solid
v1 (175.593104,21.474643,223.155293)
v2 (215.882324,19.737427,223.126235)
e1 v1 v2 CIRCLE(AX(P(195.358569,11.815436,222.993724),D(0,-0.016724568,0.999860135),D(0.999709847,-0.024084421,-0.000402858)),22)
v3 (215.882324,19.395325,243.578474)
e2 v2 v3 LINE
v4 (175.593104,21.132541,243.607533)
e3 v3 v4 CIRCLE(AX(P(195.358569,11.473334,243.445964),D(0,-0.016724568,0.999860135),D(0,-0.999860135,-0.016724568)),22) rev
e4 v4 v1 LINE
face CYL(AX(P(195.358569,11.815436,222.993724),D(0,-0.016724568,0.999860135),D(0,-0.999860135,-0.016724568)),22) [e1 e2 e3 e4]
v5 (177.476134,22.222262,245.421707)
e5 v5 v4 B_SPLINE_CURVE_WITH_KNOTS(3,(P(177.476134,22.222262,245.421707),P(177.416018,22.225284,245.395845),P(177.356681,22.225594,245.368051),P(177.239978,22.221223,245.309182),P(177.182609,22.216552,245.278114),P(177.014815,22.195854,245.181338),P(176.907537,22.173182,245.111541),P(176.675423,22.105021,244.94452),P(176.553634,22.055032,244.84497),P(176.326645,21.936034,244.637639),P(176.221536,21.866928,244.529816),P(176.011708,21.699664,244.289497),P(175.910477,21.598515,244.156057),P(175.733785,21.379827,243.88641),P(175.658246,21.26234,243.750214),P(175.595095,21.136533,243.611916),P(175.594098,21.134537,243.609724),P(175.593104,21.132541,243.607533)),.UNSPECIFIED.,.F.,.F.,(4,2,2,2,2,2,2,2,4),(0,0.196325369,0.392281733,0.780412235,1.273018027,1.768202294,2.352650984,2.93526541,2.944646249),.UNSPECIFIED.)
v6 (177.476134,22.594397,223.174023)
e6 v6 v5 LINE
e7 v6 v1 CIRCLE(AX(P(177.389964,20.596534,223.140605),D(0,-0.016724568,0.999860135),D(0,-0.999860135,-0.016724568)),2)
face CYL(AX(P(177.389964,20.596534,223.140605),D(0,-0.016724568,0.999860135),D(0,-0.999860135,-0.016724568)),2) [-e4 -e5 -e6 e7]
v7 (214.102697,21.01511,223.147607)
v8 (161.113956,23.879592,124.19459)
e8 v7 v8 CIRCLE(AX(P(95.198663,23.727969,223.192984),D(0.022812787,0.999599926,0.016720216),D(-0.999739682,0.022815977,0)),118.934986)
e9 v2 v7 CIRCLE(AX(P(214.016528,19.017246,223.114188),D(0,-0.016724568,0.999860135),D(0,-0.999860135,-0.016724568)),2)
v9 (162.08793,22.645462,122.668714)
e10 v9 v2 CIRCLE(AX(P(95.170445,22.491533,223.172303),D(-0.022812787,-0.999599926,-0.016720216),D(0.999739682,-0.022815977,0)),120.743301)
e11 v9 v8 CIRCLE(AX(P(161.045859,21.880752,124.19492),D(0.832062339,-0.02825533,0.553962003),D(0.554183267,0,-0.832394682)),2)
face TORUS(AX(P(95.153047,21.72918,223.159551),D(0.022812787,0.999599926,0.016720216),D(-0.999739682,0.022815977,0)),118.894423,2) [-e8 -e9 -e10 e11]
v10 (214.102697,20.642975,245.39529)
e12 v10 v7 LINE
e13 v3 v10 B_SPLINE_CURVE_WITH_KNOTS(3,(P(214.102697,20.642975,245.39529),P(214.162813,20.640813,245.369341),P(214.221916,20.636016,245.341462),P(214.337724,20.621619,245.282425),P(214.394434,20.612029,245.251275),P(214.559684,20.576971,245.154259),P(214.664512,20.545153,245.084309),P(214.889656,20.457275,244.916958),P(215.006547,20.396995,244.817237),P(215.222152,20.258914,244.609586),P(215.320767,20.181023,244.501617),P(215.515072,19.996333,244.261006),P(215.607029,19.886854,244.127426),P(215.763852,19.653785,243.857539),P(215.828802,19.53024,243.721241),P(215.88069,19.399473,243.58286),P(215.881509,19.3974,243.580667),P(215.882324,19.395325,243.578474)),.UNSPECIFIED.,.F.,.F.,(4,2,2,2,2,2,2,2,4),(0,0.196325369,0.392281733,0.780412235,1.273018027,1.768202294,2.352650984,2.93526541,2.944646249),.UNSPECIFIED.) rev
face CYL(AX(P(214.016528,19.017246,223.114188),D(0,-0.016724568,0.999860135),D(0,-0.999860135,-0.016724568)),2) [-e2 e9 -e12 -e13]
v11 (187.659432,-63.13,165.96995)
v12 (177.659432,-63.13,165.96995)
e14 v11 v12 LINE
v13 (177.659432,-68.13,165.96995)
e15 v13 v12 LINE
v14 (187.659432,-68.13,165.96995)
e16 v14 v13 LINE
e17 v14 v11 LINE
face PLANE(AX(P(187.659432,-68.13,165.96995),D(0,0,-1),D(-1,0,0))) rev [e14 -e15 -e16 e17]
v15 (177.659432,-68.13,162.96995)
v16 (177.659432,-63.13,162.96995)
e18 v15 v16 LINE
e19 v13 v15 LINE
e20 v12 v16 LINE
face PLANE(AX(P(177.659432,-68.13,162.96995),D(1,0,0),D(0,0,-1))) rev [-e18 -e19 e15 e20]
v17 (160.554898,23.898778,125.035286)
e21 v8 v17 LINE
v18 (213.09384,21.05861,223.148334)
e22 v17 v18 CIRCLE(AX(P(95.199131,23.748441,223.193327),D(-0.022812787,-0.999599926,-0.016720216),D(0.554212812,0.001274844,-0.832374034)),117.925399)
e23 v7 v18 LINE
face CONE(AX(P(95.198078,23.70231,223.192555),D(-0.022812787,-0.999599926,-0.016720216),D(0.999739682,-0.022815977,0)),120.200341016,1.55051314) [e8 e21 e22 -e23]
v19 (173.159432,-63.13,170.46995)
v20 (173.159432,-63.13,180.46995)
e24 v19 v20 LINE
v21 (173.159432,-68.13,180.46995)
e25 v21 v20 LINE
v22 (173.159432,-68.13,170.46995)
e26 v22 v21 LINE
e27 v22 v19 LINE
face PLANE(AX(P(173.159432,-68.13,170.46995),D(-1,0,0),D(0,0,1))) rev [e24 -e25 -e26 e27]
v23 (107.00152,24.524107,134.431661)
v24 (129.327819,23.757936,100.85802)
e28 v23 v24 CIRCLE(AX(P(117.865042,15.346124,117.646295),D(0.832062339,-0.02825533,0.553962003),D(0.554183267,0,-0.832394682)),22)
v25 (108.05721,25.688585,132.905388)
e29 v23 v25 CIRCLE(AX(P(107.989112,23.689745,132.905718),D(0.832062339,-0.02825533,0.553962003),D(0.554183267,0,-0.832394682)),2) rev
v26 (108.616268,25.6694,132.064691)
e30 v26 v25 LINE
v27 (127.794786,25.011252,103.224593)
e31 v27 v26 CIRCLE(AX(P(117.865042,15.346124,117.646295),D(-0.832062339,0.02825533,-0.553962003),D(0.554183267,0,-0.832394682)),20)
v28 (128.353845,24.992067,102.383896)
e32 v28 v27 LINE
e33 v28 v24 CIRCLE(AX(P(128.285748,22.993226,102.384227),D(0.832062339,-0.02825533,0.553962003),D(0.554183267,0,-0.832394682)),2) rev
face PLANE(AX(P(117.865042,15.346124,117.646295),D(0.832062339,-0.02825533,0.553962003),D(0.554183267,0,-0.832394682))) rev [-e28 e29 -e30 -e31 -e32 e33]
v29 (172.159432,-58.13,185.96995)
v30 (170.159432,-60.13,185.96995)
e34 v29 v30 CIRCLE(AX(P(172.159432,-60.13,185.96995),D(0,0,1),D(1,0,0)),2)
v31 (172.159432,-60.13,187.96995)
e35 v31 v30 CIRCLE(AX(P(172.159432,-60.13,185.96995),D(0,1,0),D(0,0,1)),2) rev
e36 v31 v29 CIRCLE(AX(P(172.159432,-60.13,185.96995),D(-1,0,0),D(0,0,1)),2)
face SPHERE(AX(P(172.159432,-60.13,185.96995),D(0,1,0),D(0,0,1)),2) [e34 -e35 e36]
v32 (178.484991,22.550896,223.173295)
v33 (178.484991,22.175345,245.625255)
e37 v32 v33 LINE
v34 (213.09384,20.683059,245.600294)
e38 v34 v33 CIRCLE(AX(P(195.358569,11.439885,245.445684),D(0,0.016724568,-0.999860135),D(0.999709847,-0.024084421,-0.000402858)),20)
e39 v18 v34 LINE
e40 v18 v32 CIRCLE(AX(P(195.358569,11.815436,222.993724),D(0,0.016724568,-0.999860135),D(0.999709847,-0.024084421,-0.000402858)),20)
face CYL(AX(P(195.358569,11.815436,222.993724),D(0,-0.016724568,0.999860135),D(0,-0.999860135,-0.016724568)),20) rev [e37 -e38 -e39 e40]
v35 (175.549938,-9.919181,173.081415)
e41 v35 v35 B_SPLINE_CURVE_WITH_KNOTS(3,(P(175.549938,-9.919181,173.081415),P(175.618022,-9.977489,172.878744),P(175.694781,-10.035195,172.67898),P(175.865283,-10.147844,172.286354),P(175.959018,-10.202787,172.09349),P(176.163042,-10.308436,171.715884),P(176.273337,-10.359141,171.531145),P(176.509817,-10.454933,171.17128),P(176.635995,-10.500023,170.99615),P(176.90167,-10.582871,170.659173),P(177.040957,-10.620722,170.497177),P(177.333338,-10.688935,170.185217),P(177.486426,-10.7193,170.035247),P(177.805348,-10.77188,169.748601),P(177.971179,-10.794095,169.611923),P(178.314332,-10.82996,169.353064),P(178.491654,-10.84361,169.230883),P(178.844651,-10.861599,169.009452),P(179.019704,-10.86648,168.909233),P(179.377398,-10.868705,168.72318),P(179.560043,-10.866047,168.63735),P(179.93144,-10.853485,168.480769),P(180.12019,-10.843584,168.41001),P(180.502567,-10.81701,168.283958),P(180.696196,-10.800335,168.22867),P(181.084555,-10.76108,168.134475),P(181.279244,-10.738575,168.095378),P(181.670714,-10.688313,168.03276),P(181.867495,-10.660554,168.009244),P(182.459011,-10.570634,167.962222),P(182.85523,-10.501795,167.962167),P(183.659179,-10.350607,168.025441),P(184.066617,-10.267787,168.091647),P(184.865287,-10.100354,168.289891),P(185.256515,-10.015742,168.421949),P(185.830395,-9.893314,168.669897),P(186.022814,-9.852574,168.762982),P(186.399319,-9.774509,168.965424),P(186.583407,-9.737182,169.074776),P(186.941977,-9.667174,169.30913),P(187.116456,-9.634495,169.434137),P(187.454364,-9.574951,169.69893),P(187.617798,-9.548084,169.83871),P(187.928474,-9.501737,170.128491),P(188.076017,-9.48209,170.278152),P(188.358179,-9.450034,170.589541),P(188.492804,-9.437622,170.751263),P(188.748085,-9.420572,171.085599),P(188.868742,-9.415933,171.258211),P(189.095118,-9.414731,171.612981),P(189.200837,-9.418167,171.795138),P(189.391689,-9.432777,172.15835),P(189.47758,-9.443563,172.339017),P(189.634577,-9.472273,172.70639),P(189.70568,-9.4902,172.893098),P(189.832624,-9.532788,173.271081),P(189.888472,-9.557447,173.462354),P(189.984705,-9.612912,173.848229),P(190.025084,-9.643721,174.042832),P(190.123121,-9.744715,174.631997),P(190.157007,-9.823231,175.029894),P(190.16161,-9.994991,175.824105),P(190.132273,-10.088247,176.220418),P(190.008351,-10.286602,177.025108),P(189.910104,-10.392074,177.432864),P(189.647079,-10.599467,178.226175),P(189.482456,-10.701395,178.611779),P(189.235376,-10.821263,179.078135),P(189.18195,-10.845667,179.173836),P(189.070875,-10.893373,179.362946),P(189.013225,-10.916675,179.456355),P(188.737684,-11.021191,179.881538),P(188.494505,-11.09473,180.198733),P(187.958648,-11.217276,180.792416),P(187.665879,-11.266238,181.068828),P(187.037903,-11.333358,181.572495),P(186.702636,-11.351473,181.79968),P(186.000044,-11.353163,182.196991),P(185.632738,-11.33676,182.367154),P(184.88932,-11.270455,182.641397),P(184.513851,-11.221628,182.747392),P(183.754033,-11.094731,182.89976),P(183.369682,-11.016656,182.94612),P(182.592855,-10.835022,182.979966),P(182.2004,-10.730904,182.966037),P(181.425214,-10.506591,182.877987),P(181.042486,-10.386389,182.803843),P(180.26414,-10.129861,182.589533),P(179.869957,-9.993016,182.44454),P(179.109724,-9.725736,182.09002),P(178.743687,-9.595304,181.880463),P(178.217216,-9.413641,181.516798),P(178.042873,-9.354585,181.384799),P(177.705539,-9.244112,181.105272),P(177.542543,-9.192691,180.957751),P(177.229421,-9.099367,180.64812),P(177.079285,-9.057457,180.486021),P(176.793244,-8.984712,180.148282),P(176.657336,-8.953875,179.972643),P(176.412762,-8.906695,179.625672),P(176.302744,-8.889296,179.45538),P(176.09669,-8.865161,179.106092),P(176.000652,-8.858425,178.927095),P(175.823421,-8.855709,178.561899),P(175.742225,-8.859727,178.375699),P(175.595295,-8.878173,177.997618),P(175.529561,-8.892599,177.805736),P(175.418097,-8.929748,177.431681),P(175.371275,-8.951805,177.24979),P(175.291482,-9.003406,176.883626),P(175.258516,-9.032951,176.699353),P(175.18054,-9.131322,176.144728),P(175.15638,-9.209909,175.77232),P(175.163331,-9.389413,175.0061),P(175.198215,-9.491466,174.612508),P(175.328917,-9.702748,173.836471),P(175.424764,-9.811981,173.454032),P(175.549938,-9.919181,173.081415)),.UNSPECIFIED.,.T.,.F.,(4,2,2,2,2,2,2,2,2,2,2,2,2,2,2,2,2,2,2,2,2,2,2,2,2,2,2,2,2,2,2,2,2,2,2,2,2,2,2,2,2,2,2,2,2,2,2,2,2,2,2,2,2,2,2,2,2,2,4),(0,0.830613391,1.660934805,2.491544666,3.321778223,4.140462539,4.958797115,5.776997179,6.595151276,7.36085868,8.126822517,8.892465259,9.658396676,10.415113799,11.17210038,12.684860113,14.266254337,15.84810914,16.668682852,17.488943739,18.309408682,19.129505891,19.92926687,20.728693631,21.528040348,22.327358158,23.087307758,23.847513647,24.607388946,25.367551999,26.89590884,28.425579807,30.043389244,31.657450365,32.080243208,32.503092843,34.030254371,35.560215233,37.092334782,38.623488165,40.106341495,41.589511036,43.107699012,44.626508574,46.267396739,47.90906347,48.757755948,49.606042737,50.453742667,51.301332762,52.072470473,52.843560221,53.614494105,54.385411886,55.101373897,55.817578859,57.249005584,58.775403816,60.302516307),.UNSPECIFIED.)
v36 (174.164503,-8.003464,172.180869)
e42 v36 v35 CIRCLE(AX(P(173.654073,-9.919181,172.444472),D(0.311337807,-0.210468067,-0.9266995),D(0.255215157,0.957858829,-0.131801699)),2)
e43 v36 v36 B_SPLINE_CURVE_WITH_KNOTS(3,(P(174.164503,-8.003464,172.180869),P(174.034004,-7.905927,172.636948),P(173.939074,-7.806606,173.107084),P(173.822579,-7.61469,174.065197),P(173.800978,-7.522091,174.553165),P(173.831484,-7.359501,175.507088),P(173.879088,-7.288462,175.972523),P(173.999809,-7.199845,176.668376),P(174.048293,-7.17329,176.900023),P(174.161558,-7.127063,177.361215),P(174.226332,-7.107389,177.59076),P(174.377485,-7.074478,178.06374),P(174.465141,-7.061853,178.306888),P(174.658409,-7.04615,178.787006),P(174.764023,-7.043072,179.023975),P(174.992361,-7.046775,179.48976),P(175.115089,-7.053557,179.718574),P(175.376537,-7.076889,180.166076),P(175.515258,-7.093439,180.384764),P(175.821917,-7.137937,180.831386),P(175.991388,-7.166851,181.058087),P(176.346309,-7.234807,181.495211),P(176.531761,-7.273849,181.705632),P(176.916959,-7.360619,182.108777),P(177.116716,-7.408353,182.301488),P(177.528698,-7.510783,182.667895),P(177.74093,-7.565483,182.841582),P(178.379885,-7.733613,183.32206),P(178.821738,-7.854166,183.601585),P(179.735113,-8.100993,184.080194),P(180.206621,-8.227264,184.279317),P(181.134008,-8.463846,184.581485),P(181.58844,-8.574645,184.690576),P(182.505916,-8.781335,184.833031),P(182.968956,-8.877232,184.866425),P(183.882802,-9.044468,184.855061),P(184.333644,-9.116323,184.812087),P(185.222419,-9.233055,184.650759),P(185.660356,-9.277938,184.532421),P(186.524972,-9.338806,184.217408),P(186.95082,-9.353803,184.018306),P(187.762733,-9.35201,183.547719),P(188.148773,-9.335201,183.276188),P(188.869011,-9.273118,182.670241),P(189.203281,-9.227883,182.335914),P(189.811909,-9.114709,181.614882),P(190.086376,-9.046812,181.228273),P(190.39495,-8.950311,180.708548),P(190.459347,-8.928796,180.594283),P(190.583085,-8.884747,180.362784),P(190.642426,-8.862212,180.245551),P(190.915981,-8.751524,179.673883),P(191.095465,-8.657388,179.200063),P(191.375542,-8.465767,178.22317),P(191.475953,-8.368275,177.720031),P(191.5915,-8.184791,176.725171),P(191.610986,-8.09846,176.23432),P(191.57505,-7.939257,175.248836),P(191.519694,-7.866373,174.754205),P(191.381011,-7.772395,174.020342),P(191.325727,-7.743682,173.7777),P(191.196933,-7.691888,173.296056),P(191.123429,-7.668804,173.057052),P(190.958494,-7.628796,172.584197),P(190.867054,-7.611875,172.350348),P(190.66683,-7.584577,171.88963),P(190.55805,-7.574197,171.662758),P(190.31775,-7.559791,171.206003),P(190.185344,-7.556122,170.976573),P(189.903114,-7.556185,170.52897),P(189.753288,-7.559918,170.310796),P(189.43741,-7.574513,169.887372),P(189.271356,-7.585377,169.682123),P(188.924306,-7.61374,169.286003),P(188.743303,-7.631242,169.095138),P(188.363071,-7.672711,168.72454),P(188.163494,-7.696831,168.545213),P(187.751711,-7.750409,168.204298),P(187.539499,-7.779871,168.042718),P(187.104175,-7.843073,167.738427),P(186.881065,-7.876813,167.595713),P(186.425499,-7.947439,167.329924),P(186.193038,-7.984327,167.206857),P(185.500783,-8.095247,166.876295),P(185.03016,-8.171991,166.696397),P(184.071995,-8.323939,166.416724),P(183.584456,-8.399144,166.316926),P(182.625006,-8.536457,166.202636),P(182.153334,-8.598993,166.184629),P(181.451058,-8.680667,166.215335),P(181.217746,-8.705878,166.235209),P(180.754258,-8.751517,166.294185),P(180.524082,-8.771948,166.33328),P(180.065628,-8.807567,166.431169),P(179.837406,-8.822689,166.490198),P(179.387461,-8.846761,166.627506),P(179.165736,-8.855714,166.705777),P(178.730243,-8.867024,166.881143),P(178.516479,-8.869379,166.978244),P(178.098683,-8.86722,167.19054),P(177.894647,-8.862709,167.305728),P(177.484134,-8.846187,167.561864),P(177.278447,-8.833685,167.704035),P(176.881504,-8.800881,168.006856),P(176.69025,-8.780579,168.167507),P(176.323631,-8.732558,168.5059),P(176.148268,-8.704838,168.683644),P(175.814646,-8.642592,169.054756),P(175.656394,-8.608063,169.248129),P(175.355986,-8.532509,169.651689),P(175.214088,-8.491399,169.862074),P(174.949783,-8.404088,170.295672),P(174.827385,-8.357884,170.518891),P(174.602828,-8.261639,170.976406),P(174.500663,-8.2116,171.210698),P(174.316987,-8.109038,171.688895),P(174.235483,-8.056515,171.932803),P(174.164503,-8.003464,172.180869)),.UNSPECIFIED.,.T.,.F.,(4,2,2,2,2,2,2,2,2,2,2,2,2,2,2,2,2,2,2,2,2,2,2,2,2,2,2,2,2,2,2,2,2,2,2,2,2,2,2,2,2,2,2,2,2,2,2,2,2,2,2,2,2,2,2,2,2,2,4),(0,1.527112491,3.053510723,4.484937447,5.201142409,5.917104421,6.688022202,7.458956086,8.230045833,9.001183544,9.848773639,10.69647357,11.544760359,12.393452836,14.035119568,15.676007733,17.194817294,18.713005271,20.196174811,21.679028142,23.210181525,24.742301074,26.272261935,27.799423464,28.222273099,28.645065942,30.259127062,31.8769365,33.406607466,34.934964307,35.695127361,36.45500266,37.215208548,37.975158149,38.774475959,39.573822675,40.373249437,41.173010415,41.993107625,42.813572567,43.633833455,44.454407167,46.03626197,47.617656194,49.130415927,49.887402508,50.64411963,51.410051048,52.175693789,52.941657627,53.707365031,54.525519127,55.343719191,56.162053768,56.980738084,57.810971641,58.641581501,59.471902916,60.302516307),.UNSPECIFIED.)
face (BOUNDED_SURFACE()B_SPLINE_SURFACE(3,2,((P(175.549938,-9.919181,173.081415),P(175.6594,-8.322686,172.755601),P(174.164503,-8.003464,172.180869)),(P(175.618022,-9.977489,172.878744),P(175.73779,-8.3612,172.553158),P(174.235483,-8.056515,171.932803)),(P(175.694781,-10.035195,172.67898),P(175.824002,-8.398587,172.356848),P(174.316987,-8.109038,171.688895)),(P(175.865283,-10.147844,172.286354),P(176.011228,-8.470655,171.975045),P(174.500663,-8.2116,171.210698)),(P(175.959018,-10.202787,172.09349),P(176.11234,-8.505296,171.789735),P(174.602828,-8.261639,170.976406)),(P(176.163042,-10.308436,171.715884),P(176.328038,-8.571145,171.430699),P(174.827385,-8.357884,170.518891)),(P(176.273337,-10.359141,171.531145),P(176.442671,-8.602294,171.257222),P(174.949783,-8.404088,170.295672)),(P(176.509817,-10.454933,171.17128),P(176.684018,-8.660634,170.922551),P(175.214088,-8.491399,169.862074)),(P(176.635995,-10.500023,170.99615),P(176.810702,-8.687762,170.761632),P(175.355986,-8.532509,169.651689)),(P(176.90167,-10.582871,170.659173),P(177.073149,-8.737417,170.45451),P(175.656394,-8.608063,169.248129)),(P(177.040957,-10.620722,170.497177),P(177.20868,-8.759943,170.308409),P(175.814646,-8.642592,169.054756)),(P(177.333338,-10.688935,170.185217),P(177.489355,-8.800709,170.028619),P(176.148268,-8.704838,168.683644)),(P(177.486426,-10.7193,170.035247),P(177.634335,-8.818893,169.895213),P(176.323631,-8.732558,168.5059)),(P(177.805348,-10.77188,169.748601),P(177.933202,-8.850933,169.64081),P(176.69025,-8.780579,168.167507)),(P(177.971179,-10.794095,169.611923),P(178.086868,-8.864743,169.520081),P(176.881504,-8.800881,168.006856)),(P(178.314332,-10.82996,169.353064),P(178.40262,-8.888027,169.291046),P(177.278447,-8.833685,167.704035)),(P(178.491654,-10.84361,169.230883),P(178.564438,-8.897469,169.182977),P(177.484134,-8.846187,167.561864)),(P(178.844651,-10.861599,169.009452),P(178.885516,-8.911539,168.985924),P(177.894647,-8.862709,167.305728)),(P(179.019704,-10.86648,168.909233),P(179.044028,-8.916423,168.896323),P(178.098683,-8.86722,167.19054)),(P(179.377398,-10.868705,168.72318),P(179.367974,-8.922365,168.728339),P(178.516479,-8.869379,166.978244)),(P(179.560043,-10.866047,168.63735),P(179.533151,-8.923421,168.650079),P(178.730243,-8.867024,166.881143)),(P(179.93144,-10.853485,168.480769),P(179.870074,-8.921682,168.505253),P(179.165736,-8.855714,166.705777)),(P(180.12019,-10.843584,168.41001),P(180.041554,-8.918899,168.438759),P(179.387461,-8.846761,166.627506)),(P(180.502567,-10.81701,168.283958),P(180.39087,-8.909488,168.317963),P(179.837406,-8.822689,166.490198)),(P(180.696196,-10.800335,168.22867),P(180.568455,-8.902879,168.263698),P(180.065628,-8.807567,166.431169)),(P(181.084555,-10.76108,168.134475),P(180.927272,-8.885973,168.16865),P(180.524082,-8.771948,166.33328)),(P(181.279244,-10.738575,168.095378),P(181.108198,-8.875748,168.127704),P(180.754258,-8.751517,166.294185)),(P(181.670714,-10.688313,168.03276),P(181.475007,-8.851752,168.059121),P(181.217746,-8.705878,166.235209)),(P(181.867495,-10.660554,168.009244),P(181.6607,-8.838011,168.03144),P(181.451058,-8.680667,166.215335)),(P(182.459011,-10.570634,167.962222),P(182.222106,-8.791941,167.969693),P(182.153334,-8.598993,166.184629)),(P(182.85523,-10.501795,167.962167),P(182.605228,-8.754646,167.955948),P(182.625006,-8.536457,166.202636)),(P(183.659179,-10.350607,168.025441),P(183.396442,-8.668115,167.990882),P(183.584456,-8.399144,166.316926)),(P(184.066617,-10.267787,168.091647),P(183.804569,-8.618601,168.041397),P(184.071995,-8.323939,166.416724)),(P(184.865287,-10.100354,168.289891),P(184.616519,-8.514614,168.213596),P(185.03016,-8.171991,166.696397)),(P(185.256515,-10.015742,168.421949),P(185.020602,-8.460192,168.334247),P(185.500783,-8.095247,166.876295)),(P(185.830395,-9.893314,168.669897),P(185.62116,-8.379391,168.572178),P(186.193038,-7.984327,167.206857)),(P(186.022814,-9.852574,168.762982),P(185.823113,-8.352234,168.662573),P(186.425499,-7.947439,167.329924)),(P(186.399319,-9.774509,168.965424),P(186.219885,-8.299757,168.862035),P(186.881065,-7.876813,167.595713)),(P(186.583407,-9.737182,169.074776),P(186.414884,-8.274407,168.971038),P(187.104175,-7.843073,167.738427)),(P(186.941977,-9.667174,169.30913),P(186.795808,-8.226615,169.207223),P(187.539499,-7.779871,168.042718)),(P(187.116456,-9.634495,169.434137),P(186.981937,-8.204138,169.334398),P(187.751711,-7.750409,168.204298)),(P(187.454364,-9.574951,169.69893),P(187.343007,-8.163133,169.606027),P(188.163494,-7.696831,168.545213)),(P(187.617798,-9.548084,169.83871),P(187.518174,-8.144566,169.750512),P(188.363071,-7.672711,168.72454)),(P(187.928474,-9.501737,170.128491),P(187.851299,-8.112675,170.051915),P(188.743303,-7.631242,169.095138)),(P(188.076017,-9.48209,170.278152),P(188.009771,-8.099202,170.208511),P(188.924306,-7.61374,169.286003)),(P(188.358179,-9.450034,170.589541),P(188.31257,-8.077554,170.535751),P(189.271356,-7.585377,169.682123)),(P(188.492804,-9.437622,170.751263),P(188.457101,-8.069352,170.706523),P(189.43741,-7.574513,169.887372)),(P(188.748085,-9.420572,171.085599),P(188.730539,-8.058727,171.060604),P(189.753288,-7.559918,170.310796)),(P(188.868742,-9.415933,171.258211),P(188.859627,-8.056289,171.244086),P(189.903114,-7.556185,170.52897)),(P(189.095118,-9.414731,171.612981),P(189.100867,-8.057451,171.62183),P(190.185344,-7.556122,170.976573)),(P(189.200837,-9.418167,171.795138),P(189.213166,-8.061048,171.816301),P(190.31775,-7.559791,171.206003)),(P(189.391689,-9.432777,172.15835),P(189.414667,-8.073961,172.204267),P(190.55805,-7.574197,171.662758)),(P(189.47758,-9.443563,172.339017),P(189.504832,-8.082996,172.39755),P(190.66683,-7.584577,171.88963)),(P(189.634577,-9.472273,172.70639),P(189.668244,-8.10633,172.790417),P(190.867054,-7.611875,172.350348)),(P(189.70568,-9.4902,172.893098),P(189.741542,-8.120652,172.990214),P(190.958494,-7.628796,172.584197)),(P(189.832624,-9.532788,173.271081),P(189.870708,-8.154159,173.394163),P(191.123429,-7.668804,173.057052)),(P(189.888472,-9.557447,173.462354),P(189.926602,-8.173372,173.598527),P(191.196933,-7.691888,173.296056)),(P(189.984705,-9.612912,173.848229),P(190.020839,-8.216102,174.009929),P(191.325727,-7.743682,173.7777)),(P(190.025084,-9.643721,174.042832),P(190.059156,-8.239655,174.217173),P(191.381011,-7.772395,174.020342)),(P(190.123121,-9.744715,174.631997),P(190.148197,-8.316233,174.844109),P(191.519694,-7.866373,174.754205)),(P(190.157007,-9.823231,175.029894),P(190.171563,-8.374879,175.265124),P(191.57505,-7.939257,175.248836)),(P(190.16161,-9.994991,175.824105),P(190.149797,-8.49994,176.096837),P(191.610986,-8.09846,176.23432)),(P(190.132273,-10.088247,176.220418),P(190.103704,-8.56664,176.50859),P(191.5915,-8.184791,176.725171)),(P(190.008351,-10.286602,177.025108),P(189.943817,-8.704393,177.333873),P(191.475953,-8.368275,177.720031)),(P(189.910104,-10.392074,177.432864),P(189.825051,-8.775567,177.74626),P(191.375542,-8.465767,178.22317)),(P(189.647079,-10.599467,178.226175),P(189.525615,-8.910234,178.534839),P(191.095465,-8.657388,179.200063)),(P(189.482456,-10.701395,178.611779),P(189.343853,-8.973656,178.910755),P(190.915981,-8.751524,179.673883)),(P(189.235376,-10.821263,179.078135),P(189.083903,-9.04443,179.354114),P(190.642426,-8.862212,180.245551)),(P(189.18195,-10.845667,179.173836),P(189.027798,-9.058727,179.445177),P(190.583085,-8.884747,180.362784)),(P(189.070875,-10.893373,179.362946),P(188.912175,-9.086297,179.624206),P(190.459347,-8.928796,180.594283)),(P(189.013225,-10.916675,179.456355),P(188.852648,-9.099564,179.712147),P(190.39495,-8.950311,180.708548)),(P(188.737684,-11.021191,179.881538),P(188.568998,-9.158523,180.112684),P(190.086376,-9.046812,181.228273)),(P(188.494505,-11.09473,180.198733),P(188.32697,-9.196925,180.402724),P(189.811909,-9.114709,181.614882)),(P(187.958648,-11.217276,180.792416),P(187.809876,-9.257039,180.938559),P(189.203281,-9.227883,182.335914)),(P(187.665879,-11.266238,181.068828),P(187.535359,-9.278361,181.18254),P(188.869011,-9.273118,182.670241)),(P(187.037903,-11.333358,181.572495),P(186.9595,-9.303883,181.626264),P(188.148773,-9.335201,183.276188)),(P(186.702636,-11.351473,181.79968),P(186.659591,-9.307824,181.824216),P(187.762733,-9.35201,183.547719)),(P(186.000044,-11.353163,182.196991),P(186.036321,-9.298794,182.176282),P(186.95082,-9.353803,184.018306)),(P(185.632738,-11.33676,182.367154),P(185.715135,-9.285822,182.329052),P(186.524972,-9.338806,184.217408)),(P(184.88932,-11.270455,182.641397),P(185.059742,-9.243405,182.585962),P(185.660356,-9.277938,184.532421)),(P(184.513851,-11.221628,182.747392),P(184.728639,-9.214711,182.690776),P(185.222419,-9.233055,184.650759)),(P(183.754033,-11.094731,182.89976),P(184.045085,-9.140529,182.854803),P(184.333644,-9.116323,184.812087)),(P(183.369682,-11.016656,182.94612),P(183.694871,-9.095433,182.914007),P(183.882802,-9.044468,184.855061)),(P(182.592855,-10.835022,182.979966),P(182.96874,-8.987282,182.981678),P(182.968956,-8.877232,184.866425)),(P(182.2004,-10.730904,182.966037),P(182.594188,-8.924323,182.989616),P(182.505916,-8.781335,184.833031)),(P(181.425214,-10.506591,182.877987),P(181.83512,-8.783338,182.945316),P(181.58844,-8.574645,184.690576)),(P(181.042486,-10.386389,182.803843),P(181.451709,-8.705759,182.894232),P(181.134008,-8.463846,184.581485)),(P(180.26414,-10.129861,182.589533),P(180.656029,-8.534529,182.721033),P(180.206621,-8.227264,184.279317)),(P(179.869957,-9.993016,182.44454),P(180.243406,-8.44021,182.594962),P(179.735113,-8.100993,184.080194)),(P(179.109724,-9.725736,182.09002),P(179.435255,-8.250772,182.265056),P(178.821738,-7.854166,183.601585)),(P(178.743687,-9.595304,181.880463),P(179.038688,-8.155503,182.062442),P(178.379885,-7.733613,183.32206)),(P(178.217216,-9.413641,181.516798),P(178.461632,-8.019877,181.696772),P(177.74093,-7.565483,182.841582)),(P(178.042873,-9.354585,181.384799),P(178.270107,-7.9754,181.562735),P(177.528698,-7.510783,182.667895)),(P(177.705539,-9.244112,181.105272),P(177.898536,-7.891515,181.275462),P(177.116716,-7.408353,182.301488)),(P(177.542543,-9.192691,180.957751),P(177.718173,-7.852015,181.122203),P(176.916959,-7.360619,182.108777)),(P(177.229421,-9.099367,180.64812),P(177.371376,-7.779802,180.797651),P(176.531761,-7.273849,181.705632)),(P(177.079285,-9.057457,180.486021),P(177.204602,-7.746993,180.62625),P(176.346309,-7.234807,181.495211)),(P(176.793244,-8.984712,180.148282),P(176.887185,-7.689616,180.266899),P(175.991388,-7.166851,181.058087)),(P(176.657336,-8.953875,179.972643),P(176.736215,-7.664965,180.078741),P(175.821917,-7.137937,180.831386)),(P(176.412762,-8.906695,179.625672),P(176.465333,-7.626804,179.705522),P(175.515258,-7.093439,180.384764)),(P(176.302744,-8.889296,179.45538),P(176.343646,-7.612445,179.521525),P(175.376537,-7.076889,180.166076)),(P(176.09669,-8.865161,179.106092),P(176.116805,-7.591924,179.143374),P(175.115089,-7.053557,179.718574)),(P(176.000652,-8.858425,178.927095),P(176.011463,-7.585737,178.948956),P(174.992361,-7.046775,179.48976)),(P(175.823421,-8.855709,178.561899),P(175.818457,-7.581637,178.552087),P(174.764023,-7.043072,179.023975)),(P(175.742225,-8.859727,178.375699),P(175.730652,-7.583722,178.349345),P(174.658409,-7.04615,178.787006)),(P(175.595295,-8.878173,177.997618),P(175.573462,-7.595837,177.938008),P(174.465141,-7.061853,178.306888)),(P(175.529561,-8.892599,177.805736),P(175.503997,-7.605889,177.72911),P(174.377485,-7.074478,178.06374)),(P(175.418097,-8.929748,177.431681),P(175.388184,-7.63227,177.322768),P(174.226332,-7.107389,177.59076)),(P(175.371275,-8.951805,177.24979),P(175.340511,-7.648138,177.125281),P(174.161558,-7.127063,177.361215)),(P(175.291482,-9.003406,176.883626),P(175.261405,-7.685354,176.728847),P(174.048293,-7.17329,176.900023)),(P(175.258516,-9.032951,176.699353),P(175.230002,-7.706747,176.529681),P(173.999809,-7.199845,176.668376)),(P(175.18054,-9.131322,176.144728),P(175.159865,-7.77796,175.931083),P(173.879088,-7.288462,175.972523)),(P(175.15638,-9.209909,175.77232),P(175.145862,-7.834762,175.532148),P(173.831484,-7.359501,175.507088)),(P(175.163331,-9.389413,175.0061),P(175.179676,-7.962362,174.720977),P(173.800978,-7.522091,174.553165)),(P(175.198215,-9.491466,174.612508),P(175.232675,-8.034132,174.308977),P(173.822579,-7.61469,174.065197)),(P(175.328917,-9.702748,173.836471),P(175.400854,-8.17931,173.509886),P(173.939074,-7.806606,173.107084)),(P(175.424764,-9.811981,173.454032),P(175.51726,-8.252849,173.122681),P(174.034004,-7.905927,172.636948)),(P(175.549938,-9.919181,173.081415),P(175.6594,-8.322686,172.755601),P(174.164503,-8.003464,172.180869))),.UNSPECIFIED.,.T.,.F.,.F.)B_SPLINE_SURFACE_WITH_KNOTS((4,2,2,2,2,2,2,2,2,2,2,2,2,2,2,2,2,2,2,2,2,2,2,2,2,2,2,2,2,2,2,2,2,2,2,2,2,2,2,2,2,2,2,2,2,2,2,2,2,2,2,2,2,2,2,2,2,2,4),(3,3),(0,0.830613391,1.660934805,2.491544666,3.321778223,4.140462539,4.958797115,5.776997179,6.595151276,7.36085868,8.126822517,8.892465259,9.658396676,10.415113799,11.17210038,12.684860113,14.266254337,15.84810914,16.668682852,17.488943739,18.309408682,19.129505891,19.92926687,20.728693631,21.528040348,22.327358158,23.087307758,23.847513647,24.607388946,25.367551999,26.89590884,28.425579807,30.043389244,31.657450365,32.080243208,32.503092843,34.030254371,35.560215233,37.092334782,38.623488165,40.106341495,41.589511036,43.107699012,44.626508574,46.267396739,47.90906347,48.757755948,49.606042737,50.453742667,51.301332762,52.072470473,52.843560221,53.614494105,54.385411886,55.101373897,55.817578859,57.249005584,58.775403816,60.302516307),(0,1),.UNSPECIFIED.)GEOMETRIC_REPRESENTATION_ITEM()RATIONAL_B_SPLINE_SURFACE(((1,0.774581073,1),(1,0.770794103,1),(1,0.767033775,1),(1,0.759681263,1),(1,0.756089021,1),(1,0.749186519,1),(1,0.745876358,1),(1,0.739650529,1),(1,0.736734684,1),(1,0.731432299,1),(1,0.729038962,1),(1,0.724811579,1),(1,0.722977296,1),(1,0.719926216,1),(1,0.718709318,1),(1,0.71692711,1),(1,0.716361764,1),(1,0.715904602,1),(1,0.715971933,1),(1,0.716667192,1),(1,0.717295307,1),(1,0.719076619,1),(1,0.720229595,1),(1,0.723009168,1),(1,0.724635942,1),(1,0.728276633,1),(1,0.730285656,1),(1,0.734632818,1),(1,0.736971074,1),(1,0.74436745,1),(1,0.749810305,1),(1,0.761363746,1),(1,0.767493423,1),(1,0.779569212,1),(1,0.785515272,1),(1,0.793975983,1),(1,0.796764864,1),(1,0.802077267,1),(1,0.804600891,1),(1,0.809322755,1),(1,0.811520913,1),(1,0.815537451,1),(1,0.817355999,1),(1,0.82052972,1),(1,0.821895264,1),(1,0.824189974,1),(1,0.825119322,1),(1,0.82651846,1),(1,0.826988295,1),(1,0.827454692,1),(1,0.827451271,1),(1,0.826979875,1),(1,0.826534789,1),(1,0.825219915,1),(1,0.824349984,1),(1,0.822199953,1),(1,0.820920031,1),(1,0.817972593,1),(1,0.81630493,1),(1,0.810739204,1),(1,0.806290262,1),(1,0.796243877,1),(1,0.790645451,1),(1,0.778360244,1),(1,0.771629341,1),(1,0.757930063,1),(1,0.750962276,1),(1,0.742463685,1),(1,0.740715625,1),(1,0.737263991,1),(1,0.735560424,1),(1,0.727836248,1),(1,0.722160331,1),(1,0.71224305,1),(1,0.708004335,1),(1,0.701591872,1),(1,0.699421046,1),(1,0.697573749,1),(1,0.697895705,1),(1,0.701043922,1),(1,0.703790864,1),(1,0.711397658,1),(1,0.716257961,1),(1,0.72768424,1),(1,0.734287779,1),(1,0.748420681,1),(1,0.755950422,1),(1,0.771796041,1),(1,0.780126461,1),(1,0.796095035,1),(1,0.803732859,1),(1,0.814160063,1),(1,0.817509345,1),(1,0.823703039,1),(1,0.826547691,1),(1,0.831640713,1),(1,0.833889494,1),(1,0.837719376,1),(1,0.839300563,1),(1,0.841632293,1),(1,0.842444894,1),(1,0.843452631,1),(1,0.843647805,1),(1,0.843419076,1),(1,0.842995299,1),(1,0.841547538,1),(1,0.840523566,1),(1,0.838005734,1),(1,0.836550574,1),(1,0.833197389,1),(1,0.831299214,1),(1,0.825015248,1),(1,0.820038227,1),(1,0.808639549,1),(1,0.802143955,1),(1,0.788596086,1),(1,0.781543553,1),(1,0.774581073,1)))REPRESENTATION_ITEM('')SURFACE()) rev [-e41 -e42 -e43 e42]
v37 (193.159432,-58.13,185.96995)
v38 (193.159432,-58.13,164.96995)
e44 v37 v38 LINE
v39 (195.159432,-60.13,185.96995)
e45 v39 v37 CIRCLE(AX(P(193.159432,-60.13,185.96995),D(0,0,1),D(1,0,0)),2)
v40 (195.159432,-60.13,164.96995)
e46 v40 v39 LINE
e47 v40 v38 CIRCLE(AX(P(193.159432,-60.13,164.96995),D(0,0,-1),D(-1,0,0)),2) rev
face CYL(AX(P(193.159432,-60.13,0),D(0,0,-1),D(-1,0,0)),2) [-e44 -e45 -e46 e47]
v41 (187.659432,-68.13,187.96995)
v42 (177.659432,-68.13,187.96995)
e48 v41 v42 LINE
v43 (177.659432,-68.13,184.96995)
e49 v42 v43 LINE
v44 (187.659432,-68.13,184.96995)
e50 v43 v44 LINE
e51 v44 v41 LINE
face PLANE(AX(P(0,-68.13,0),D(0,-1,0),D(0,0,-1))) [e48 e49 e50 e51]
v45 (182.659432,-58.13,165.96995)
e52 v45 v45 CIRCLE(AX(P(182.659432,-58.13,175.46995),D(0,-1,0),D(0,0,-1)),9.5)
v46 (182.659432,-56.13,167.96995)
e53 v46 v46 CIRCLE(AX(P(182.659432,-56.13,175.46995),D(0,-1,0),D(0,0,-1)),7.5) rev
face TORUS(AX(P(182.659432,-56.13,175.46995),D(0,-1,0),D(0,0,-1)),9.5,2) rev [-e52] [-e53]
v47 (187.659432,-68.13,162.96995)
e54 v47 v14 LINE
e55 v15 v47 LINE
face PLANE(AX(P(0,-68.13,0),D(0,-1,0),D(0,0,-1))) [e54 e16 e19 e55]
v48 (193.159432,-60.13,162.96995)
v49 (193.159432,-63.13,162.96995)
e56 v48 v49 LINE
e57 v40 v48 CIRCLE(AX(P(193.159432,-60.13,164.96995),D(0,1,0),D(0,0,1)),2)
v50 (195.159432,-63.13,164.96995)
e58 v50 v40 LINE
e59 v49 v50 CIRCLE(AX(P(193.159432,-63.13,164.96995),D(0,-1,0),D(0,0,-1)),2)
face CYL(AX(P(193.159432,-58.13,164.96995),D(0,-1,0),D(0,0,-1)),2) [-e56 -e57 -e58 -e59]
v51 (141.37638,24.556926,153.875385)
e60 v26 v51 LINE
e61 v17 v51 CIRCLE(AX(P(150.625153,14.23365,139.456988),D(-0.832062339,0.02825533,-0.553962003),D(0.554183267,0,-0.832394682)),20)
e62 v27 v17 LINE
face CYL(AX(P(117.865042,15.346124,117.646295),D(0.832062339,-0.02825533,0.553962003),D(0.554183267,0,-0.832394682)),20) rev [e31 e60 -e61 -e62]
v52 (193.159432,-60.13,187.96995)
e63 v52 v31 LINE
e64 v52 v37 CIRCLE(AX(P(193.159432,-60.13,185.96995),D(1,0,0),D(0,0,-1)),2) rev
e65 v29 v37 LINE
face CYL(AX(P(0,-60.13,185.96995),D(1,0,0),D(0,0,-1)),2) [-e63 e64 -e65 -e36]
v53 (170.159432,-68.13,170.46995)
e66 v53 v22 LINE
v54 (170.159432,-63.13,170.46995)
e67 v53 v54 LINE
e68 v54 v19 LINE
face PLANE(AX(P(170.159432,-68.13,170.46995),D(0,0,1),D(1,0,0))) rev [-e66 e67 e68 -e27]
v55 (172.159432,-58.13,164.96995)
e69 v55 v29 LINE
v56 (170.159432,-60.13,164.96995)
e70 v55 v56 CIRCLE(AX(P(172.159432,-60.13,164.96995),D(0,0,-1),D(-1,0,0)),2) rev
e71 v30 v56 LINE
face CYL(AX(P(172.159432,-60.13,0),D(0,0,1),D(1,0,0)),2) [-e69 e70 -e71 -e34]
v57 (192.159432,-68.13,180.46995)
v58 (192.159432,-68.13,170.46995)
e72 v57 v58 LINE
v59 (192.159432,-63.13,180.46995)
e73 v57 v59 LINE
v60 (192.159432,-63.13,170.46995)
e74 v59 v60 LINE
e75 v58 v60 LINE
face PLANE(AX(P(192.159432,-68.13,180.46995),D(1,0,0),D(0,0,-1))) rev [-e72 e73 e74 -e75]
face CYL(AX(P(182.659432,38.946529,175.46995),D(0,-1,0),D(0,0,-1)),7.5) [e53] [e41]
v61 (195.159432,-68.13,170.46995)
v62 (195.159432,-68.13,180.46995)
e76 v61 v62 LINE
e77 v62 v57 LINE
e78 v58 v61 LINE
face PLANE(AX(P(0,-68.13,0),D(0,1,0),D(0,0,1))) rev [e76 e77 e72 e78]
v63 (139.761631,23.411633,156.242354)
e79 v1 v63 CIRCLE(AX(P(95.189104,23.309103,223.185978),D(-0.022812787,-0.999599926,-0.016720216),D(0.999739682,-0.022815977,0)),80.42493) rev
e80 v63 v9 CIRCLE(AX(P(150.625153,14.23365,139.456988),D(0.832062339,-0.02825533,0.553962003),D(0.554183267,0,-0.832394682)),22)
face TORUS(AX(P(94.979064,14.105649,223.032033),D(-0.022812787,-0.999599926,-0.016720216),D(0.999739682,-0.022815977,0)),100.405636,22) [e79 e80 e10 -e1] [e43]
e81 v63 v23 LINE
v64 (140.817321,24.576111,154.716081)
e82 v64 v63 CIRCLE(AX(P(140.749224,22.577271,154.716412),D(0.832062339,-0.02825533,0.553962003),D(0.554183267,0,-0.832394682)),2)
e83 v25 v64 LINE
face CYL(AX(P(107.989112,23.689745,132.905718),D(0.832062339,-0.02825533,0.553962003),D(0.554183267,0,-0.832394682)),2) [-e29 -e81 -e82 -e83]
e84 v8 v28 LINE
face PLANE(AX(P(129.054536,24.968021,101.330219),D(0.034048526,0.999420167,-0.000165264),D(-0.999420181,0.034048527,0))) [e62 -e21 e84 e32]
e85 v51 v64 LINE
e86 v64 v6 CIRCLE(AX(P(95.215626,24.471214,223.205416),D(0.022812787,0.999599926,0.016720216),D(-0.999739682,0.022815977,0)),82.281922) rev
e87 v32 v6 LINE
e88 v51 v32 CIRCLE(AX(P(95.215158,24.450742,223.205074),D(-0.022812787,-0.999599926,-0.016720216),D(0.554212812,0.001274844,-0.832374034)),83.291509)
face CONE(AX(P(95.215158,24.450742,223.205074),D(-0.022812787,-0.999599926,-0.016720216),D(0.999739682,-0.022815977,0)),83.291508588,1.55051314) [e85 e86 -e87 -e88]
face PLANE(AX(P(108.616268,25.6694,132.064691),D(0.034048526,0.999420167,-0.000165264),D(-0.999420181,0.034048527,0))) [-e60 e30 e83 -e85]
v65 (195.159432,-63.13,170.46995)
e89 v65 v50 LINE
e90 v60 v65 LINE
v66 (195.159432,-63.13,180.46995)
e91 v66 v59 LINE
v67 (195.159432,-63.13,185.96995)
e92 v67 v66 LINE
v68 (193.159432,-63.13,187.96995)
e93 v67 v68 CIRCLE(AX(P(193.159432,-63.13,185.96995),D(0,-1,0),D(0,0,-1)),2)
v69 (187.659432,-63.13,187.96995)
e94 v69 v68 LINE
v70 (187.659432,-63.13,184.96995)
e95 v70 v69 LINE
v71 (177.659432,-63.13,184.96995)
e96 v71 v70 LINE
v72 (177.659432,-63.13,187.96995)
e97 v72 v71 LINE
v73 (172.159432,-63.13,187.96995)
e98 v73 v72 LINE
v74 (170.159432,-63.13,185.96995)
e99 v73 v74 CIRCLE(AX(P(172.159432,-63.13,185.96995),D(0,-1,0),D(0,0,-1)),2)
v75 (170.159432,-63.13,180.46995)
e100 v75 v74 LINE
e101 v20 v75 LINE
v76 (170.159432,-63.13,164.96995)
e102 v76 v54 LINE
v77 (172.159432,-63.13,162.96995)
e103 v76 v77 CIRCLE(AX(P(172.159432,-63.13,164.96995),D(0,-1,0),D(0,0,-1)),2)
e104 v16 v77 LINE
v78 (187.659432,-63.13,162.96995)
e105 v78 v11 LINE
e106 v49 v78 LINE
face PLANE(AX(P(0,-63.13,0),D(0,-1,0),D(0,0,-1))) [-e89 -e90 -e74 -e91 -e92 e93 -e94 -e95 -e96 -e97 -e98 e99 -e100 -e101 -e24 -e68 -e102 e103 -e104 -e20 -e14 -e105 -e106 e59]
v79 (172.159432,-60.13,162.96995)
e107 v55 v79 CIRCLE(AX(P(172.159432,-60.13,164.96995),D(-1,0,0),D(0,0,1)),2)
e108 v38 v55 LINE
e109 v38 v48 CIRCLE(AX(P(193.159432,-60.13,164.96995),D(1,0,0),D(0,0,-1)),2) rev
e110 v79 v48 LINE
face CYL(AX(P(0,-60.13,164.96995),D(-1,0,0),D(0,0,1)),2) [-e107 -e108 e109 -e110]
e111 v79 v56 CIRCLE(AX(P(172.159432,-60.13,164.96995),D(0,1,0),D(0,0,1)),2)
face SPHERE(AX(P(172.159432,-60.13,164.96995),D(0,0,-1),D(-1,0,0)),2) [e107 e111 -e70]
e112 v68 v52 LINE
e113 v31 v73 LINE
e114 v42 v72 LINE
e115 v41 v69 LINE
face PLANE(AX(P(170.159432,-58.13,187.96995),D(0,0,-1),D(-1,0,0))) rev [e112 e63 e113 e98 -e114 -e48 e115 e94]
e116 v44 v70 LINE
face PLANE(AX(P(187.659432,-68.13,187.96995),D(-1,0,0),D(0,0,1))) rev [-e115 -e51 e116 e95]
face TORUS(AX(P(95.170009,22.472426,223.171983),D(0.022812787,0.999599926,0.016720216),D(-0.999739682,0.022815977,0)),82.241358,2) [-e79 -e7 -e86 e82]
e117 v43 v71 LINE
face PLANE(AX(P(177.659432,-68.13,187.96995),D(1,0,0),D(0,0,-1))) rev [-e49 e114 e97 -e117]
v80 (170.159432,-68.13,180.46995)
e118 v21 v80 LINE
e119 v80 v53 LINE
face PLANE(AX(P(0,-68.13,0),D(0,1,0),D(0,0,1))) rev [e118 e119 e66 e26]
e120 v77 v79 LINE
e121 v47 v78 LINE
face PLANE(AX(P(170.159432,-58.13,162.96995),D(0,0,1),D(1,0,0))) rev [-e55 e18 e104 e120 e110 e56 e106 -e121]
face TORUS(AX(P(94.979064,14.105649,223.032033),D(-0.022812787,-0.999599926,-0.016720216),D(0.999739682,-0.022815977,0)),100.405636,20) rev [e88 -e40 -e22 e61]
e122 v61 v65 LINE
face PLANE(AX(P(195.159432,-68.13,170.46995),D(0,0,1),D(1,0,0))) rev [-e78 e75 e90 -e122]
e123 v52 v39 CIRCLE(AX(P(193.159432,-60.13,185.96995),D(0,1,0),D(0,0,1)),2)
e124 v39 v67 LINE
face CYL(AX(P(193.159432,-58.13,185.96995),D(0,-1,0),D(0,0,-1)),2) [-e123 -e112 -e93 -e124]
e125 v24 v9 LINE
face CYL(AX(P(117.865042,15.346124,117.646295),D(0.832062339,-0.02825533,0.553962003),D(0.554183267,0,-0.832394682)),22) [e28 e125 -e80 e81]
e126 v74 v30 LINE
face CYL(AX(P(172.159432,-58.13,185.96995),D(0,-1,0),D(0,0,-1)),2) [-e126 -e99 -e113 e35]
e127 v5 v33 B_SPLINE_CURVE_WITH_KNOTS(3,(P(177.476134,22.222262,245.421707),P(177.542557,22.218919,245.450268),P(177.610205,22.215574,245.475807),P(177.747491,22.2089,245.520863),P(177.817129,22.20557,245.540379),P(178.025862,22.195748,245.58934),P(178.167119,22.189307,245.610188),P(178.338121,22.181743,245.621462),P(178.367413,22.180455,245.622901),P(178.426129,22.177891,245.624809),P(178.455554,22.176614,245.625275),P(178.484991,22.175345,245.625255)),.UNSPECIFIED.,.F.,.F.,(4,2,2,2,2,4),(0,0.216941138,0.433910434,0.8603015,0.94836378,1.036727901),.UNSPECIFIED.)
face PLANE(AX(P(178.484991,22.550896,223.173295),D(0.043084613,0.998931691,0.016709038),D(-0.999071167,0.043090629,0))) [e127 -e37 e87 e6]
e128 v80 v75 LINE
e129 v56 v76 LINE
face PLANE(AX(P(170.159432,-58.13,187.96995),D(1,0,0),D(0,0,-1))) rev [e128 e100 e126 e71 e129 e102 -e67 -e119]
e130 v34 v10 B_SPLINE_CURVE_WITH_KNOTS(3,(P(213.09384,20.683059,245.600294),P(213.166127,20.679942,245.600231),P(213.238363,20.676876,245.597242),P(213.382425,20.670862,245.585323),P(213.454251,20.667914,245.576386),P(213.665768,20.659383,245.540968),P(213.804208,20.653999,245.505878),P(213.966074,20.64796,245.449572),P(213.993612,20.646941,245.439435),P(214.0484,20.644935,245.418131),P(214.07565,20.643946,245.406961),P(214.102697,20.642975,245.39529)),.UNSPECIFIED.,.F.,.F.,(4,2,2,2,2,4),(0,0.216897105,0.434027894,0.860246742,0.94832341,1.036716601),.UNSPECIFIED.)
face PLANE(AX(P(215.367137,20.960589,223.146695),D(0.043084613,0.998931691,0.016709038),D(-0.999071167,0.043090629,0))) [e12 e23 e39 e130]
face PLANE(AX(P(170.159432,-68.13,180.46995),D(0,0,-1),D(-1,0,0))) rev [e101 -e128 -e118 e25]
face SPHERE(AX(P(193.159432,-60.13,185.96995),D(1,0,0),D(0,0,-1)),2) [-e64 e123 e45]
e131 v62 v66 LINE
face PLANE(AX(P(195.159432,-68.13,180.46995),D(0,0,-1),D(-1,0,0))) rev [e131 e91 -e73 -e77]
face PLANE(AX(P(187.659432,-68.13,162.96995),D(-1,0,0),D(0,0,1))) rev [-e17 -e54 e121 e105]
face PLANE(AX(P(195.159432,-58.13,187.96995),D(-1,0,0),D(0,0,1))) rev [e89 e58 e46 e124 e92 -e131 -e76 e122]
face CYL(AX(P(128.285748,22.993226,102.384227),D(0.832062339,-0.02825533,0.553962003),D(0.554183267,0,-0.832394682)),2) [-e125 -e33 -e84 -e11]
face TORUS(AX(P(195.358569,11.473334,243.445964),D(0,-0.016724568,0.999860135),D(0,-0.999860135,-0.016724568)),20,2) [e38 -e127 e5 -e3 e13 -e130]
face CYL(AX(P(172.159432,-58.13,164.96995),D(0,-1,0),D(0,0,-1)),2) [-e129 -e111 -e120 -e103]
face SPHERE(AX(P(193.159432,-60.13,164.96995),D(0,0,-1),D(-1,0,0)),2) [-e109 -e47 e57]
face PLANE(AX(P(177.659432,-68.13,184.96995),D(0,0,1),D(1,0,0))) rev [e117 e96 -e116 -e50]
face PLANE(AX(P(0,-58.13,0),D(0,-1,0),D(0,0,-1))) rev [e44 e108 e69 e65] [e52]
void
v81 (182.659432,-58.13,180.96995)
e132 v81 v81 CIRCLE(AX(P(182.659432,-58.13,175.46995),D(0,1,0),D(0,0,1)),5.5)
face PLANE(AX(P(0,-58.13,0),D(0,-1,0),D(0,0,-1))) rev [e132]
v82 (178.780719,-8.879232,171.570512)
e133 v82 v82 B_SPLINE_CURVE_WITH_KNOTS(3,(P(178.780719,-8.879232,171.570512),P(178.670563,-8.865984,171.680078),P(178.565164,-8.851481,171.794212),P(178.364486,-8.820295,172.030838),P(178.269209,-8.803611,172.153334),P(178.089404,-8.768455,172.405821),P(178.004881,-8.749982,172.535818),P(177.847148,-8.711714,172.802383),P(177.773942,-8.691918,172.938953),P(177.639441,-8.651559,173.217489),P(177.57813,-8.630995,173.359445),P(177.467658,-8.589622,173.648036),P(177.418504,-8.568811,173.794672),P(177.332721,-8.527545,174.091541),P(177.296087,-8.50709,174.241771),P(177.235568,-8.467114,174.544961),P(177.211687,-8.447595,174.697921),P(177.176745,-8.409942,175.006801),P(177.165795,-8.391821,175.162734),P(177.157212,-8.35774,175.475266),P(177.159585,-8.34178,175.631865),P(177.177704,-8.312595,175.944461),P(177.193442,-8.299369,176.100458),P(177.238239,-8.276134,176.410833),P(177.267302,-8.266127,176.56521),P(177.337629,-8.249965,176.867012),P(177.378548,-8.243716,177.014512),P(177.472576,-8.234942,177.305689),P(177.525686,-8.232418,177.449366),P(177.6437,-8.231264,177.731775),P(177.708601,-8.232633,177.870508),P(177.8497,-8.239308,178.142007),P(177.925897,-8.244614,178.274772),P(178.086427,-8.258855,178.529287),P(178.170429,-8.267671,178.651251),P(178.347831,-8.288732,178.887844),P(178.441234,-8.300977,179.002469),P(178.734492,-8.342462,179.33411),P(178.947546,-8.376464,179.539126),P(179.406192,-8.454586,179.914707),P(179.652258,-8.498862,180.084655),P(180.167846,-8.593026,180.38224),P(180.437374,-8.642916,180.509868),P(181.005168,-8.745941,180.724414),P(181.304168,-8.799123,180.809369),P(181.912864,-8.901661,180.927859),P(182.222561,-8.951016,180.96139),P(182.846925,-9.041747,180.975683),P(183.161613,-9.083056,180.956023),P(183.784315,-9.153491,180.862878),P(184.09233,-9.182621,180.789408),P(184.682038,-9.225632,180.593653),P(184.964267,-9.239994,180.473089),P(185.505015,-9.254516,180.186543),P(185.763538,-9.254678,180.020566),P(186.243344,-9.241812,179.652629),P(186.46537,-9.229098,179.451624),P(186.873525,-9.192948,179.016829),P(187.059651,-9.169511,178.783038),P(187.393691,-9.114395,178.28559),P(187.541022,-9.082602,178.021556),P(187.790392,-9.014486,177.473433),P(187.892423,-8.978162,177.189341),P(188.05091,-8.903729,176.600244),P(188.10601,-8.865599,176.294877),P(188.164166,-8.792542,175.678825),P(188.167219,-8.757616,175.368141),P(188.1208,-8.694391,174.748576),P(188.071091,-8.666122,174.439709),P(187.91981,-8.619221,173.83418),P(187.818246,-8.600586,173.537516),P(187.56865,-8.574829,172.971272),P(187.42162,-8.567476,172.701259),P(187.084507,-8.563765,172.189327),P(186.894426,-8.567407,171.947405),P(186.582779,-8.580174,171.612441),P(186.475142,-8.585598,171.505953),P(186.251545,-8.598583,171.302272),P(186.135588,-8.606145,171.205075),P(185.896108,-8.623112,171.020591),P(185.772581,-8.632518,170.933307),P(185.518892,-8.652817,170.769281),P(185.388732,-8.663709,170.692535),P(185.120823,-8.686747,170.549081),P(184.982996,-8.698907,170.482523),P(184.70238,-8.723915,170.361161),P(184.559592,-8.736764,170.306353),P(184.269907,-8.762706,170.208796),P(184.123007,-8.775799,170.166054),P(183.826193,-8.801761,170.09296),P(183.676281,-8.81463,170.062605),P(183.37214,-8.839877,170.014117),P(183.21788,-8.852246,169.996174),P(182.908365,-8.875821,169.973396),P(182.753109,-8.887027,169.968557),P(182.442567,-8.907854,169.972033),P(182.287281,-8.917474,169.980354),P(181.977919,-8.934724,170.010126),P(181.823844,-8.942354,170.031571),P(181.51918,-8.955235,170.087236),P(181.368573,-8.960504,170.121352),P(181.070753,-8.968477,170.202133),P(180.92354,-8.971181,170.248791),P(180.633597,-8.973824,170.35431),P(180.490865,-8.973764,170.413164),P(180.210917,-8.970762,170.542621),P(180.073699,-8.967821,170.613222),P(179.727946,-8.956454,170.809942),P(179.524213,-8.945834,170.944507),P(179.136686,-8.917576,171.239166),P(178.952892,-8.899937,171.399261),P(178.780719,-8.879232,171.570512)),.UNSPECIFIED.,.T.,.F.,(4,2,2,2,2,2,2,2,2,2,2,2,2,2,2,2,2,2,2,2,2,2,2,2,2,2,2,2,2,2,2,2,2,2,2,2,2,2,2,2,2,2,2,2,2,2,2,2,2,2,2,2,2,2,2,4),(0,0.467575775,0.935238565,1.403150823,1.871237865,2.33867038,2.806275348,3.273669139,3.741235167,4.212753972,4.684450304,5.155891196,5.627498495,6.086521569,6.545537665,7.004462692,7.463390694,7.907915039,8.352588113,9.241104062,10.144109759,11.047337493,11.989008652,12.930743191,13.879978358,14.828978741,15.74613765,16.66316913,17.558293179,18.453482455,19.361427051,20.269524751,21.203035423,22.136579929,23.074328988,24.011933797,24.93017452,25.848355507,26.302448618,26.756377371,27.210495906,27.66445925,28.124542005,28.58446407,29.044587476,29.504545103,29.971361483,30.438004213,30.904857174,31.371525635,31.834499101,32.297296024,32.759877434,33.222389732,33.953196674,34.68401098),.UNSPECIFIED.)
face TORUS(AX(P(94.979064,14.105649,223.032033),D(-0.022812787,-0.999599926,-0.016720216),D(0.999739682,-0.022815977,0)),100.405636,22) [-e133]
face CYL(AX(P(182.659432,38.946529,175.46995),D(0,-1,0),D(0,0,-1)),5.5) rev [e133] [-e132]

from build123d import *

# Parameters (mm, degrees)
SKETCH8_W                      = 25
SKETCH8_H                      = 25
BOSS_EXTRUDE1_DEPTH            = 5
BOSS_EXTRUDE2_REACH            = 340.536
BOSS_EXTRUDE2_END_MAJOR_RADIUS = 100.405635927
BOSS_EXTRUDE2_END_MINOR_RADIUS = 22
SKETCH9_R                      = 7.5
SKETCH9_R_2                    = 5.5
SKETCH10_W                     = 3
SKETCH10_H                     = 10
SKETCH10_W_2                   = 10
SKETCH10_H_2                   = 3
BOSS_EXTRUDE3_DEPTH            = 5
FILLET1_R                      = 2


with BuildPart() as part:
    # Sweep1: sweep along a path in Sketch5
    with BuildLine(Plane(origin=(0, 0, 0), x_dir=(0.9997397545029943, -0.022809596622636426, -0.00038153401579630816), z_dir=(0.022812787341589733, 0.9995999255318432, 0.016720215621847893))) as sweep1_path:
        Line((194.547507167, -245.220027859), (194.547507167, -222.76492725))
        ThreePointArc((194.547507167, -222.76492725), (182.70523744, -175.56095927), (149.983215305, -139.53703371))
        Line((149.983215305, -139.53703371), (117.214576165, -117.710784863))
    # Sketch7 → Sweep1 (sweep)
    with BuildSketch(Plane(origin=(117.1840716, -4.64227924, 117.649599852), x_dir=(0.5536361283474212, -0.018999100028837552, -0.8325419338307064), z_dir=(0.8320623385601692, -0.028255329561967652, 0.5539620033008825))):
        with BuildLine():
            Line((-17.320508076, 30), (-19.595917942, 30))
            ThreePointArc((-19.595917942, 30), (0, -2), (19.595917942, 30))
            Line((19.595917942, 30), (17.320508076, 30))
            ThreePointArc((17.320508076, 30), (0, 0), (-17.320508076, 30))
        make_face()
    sweep(path=sweep1_path.line)



with BuildPart() as body_2:
    # Sketch8 → Boss-Extrude1 (new body)
    with BuildSketch(Plane(origin=(0, -63.13, 0), x_dir=(1, 0, 0), z_dir=(0, 1, 0))):
        with Locations((182.659431616, -175.469950055)):
            Rectangle(SKETCH8_W, SKETCH8_H)
    extrude(amount=BOSS_EXTRUDE1_DEPTH)


with BuildPart() as part_1:
    add(part.part)

    add(body_2.part)  # Boss-Extrude2 merges body 2
    # Boss-Extrude2: up to this torus (the profile starts outside it)
    boss_extrude2_end = Plane(origin=(94.9790635, 14.105648521, 223.032032588), z_dir=(-0.022812787341589733, -0.9995999255318432, -0.016720215621847893)) * Torus(BOSS_EXTRUDE2_END_MAJOR_RADIUS, BOSS_EXTRUDE2_END_MINOR_RADIUS, mode=Mode.PRIVATE)
    # Sketch9 → Boss-Extrude2 (add, up to the surface)
    with BuildSketch(Plane(origin=(0, -58.13, 0), x_dir=(1, 0, 0), z_dir=(0, 1, 0)), mode=Mode.PRIVATE) as boss_extrude2_sk1:
        with Locations(Location((182.659431616, -175.469950055, 0), (0, 0, 135.488790449))):
            Circle(SKETCH9_R)
        with Locations(Location((182.659431616, -175.469950055, 0), (0, 0, 134.847331682))):
            Circle(SKETCH9_R_2, mode=Mode.SUBTRACT)
    boss_extrude2_tool1 = extrude(boss_extrude2_sk1.sketch, amount=BOSS_EXTRUDE2_REACH, mode=Mode.PRIVATE) - boss_extrude2_end
    add(boss_extrude2_tool1.solids().sort_by_distance((187.856507, -58.13, 180.579101))[0])

    # Sketch10 → Boss-Extrude3 (add)
    with BuildSketch(Plane.XZ.offset(63.13)):
        with Locations((193.659431616, 175.469950055)):
            Rectangle(SKETCH10_W, SKETCH10_H)
        with Locations((182.659431616, 164.469950055)):
            Rectangle(SKETCH10_W_2, SKETCH10_H_2)
        with Locations((171.659431616, 175.469950055)):
            Rectangle(SKETCH10_W, SKETCH10_H)
        with Locations((182.659431616, 186.469950055)):
            Rectangle(SKETCH10_W_2, SKETCH10_H_2)
    extrude(amount=BOSS_EXTRUDE3_DEPTH)

    # Fillet1
    fillet1_edges = [part_1.edges().sort_by_distance(p)[0] for p in [
        (170.159431616, -60.63, 187.969950055),
        (170.159431616, -60.63, 162.969950055),
        (195.159431616, -60.63, 162.969950055),
        (195.159431616, -60.63, 187.969950055),
        (187.938592199, -9.225851682, 180.797281789),
        (188.007781419, -58.13, 180.727816009),
        (182.659431616, -58.13, 187.969950055),
        (170.159431616, -58.13, 175.469950055),
        (182.659431616, -58.13, 162.969950055),
        (195.159431616, -58.13, 175.469950055),
        (123.73657487, 25.156393567, 144.864412221),
        (166.619990229, 23.507355906, 184.94091022),
        (176.211693741, 22.461141905, 234.400915023),
        (215.367137143, 20.772812998, 234.372674502),
        (145.434591152, 24.411783957, 112.235565383),
        (201.136392999, 22.234211756, 166.420730851),
        (194.410707828, -10.536612604, 245.078085501),
    ]]
    fillet(fillet1_edges, radius=FILLET1_R - 0.0001)  # a hair under: the kernel refuses the full size


solid = part_1.part
